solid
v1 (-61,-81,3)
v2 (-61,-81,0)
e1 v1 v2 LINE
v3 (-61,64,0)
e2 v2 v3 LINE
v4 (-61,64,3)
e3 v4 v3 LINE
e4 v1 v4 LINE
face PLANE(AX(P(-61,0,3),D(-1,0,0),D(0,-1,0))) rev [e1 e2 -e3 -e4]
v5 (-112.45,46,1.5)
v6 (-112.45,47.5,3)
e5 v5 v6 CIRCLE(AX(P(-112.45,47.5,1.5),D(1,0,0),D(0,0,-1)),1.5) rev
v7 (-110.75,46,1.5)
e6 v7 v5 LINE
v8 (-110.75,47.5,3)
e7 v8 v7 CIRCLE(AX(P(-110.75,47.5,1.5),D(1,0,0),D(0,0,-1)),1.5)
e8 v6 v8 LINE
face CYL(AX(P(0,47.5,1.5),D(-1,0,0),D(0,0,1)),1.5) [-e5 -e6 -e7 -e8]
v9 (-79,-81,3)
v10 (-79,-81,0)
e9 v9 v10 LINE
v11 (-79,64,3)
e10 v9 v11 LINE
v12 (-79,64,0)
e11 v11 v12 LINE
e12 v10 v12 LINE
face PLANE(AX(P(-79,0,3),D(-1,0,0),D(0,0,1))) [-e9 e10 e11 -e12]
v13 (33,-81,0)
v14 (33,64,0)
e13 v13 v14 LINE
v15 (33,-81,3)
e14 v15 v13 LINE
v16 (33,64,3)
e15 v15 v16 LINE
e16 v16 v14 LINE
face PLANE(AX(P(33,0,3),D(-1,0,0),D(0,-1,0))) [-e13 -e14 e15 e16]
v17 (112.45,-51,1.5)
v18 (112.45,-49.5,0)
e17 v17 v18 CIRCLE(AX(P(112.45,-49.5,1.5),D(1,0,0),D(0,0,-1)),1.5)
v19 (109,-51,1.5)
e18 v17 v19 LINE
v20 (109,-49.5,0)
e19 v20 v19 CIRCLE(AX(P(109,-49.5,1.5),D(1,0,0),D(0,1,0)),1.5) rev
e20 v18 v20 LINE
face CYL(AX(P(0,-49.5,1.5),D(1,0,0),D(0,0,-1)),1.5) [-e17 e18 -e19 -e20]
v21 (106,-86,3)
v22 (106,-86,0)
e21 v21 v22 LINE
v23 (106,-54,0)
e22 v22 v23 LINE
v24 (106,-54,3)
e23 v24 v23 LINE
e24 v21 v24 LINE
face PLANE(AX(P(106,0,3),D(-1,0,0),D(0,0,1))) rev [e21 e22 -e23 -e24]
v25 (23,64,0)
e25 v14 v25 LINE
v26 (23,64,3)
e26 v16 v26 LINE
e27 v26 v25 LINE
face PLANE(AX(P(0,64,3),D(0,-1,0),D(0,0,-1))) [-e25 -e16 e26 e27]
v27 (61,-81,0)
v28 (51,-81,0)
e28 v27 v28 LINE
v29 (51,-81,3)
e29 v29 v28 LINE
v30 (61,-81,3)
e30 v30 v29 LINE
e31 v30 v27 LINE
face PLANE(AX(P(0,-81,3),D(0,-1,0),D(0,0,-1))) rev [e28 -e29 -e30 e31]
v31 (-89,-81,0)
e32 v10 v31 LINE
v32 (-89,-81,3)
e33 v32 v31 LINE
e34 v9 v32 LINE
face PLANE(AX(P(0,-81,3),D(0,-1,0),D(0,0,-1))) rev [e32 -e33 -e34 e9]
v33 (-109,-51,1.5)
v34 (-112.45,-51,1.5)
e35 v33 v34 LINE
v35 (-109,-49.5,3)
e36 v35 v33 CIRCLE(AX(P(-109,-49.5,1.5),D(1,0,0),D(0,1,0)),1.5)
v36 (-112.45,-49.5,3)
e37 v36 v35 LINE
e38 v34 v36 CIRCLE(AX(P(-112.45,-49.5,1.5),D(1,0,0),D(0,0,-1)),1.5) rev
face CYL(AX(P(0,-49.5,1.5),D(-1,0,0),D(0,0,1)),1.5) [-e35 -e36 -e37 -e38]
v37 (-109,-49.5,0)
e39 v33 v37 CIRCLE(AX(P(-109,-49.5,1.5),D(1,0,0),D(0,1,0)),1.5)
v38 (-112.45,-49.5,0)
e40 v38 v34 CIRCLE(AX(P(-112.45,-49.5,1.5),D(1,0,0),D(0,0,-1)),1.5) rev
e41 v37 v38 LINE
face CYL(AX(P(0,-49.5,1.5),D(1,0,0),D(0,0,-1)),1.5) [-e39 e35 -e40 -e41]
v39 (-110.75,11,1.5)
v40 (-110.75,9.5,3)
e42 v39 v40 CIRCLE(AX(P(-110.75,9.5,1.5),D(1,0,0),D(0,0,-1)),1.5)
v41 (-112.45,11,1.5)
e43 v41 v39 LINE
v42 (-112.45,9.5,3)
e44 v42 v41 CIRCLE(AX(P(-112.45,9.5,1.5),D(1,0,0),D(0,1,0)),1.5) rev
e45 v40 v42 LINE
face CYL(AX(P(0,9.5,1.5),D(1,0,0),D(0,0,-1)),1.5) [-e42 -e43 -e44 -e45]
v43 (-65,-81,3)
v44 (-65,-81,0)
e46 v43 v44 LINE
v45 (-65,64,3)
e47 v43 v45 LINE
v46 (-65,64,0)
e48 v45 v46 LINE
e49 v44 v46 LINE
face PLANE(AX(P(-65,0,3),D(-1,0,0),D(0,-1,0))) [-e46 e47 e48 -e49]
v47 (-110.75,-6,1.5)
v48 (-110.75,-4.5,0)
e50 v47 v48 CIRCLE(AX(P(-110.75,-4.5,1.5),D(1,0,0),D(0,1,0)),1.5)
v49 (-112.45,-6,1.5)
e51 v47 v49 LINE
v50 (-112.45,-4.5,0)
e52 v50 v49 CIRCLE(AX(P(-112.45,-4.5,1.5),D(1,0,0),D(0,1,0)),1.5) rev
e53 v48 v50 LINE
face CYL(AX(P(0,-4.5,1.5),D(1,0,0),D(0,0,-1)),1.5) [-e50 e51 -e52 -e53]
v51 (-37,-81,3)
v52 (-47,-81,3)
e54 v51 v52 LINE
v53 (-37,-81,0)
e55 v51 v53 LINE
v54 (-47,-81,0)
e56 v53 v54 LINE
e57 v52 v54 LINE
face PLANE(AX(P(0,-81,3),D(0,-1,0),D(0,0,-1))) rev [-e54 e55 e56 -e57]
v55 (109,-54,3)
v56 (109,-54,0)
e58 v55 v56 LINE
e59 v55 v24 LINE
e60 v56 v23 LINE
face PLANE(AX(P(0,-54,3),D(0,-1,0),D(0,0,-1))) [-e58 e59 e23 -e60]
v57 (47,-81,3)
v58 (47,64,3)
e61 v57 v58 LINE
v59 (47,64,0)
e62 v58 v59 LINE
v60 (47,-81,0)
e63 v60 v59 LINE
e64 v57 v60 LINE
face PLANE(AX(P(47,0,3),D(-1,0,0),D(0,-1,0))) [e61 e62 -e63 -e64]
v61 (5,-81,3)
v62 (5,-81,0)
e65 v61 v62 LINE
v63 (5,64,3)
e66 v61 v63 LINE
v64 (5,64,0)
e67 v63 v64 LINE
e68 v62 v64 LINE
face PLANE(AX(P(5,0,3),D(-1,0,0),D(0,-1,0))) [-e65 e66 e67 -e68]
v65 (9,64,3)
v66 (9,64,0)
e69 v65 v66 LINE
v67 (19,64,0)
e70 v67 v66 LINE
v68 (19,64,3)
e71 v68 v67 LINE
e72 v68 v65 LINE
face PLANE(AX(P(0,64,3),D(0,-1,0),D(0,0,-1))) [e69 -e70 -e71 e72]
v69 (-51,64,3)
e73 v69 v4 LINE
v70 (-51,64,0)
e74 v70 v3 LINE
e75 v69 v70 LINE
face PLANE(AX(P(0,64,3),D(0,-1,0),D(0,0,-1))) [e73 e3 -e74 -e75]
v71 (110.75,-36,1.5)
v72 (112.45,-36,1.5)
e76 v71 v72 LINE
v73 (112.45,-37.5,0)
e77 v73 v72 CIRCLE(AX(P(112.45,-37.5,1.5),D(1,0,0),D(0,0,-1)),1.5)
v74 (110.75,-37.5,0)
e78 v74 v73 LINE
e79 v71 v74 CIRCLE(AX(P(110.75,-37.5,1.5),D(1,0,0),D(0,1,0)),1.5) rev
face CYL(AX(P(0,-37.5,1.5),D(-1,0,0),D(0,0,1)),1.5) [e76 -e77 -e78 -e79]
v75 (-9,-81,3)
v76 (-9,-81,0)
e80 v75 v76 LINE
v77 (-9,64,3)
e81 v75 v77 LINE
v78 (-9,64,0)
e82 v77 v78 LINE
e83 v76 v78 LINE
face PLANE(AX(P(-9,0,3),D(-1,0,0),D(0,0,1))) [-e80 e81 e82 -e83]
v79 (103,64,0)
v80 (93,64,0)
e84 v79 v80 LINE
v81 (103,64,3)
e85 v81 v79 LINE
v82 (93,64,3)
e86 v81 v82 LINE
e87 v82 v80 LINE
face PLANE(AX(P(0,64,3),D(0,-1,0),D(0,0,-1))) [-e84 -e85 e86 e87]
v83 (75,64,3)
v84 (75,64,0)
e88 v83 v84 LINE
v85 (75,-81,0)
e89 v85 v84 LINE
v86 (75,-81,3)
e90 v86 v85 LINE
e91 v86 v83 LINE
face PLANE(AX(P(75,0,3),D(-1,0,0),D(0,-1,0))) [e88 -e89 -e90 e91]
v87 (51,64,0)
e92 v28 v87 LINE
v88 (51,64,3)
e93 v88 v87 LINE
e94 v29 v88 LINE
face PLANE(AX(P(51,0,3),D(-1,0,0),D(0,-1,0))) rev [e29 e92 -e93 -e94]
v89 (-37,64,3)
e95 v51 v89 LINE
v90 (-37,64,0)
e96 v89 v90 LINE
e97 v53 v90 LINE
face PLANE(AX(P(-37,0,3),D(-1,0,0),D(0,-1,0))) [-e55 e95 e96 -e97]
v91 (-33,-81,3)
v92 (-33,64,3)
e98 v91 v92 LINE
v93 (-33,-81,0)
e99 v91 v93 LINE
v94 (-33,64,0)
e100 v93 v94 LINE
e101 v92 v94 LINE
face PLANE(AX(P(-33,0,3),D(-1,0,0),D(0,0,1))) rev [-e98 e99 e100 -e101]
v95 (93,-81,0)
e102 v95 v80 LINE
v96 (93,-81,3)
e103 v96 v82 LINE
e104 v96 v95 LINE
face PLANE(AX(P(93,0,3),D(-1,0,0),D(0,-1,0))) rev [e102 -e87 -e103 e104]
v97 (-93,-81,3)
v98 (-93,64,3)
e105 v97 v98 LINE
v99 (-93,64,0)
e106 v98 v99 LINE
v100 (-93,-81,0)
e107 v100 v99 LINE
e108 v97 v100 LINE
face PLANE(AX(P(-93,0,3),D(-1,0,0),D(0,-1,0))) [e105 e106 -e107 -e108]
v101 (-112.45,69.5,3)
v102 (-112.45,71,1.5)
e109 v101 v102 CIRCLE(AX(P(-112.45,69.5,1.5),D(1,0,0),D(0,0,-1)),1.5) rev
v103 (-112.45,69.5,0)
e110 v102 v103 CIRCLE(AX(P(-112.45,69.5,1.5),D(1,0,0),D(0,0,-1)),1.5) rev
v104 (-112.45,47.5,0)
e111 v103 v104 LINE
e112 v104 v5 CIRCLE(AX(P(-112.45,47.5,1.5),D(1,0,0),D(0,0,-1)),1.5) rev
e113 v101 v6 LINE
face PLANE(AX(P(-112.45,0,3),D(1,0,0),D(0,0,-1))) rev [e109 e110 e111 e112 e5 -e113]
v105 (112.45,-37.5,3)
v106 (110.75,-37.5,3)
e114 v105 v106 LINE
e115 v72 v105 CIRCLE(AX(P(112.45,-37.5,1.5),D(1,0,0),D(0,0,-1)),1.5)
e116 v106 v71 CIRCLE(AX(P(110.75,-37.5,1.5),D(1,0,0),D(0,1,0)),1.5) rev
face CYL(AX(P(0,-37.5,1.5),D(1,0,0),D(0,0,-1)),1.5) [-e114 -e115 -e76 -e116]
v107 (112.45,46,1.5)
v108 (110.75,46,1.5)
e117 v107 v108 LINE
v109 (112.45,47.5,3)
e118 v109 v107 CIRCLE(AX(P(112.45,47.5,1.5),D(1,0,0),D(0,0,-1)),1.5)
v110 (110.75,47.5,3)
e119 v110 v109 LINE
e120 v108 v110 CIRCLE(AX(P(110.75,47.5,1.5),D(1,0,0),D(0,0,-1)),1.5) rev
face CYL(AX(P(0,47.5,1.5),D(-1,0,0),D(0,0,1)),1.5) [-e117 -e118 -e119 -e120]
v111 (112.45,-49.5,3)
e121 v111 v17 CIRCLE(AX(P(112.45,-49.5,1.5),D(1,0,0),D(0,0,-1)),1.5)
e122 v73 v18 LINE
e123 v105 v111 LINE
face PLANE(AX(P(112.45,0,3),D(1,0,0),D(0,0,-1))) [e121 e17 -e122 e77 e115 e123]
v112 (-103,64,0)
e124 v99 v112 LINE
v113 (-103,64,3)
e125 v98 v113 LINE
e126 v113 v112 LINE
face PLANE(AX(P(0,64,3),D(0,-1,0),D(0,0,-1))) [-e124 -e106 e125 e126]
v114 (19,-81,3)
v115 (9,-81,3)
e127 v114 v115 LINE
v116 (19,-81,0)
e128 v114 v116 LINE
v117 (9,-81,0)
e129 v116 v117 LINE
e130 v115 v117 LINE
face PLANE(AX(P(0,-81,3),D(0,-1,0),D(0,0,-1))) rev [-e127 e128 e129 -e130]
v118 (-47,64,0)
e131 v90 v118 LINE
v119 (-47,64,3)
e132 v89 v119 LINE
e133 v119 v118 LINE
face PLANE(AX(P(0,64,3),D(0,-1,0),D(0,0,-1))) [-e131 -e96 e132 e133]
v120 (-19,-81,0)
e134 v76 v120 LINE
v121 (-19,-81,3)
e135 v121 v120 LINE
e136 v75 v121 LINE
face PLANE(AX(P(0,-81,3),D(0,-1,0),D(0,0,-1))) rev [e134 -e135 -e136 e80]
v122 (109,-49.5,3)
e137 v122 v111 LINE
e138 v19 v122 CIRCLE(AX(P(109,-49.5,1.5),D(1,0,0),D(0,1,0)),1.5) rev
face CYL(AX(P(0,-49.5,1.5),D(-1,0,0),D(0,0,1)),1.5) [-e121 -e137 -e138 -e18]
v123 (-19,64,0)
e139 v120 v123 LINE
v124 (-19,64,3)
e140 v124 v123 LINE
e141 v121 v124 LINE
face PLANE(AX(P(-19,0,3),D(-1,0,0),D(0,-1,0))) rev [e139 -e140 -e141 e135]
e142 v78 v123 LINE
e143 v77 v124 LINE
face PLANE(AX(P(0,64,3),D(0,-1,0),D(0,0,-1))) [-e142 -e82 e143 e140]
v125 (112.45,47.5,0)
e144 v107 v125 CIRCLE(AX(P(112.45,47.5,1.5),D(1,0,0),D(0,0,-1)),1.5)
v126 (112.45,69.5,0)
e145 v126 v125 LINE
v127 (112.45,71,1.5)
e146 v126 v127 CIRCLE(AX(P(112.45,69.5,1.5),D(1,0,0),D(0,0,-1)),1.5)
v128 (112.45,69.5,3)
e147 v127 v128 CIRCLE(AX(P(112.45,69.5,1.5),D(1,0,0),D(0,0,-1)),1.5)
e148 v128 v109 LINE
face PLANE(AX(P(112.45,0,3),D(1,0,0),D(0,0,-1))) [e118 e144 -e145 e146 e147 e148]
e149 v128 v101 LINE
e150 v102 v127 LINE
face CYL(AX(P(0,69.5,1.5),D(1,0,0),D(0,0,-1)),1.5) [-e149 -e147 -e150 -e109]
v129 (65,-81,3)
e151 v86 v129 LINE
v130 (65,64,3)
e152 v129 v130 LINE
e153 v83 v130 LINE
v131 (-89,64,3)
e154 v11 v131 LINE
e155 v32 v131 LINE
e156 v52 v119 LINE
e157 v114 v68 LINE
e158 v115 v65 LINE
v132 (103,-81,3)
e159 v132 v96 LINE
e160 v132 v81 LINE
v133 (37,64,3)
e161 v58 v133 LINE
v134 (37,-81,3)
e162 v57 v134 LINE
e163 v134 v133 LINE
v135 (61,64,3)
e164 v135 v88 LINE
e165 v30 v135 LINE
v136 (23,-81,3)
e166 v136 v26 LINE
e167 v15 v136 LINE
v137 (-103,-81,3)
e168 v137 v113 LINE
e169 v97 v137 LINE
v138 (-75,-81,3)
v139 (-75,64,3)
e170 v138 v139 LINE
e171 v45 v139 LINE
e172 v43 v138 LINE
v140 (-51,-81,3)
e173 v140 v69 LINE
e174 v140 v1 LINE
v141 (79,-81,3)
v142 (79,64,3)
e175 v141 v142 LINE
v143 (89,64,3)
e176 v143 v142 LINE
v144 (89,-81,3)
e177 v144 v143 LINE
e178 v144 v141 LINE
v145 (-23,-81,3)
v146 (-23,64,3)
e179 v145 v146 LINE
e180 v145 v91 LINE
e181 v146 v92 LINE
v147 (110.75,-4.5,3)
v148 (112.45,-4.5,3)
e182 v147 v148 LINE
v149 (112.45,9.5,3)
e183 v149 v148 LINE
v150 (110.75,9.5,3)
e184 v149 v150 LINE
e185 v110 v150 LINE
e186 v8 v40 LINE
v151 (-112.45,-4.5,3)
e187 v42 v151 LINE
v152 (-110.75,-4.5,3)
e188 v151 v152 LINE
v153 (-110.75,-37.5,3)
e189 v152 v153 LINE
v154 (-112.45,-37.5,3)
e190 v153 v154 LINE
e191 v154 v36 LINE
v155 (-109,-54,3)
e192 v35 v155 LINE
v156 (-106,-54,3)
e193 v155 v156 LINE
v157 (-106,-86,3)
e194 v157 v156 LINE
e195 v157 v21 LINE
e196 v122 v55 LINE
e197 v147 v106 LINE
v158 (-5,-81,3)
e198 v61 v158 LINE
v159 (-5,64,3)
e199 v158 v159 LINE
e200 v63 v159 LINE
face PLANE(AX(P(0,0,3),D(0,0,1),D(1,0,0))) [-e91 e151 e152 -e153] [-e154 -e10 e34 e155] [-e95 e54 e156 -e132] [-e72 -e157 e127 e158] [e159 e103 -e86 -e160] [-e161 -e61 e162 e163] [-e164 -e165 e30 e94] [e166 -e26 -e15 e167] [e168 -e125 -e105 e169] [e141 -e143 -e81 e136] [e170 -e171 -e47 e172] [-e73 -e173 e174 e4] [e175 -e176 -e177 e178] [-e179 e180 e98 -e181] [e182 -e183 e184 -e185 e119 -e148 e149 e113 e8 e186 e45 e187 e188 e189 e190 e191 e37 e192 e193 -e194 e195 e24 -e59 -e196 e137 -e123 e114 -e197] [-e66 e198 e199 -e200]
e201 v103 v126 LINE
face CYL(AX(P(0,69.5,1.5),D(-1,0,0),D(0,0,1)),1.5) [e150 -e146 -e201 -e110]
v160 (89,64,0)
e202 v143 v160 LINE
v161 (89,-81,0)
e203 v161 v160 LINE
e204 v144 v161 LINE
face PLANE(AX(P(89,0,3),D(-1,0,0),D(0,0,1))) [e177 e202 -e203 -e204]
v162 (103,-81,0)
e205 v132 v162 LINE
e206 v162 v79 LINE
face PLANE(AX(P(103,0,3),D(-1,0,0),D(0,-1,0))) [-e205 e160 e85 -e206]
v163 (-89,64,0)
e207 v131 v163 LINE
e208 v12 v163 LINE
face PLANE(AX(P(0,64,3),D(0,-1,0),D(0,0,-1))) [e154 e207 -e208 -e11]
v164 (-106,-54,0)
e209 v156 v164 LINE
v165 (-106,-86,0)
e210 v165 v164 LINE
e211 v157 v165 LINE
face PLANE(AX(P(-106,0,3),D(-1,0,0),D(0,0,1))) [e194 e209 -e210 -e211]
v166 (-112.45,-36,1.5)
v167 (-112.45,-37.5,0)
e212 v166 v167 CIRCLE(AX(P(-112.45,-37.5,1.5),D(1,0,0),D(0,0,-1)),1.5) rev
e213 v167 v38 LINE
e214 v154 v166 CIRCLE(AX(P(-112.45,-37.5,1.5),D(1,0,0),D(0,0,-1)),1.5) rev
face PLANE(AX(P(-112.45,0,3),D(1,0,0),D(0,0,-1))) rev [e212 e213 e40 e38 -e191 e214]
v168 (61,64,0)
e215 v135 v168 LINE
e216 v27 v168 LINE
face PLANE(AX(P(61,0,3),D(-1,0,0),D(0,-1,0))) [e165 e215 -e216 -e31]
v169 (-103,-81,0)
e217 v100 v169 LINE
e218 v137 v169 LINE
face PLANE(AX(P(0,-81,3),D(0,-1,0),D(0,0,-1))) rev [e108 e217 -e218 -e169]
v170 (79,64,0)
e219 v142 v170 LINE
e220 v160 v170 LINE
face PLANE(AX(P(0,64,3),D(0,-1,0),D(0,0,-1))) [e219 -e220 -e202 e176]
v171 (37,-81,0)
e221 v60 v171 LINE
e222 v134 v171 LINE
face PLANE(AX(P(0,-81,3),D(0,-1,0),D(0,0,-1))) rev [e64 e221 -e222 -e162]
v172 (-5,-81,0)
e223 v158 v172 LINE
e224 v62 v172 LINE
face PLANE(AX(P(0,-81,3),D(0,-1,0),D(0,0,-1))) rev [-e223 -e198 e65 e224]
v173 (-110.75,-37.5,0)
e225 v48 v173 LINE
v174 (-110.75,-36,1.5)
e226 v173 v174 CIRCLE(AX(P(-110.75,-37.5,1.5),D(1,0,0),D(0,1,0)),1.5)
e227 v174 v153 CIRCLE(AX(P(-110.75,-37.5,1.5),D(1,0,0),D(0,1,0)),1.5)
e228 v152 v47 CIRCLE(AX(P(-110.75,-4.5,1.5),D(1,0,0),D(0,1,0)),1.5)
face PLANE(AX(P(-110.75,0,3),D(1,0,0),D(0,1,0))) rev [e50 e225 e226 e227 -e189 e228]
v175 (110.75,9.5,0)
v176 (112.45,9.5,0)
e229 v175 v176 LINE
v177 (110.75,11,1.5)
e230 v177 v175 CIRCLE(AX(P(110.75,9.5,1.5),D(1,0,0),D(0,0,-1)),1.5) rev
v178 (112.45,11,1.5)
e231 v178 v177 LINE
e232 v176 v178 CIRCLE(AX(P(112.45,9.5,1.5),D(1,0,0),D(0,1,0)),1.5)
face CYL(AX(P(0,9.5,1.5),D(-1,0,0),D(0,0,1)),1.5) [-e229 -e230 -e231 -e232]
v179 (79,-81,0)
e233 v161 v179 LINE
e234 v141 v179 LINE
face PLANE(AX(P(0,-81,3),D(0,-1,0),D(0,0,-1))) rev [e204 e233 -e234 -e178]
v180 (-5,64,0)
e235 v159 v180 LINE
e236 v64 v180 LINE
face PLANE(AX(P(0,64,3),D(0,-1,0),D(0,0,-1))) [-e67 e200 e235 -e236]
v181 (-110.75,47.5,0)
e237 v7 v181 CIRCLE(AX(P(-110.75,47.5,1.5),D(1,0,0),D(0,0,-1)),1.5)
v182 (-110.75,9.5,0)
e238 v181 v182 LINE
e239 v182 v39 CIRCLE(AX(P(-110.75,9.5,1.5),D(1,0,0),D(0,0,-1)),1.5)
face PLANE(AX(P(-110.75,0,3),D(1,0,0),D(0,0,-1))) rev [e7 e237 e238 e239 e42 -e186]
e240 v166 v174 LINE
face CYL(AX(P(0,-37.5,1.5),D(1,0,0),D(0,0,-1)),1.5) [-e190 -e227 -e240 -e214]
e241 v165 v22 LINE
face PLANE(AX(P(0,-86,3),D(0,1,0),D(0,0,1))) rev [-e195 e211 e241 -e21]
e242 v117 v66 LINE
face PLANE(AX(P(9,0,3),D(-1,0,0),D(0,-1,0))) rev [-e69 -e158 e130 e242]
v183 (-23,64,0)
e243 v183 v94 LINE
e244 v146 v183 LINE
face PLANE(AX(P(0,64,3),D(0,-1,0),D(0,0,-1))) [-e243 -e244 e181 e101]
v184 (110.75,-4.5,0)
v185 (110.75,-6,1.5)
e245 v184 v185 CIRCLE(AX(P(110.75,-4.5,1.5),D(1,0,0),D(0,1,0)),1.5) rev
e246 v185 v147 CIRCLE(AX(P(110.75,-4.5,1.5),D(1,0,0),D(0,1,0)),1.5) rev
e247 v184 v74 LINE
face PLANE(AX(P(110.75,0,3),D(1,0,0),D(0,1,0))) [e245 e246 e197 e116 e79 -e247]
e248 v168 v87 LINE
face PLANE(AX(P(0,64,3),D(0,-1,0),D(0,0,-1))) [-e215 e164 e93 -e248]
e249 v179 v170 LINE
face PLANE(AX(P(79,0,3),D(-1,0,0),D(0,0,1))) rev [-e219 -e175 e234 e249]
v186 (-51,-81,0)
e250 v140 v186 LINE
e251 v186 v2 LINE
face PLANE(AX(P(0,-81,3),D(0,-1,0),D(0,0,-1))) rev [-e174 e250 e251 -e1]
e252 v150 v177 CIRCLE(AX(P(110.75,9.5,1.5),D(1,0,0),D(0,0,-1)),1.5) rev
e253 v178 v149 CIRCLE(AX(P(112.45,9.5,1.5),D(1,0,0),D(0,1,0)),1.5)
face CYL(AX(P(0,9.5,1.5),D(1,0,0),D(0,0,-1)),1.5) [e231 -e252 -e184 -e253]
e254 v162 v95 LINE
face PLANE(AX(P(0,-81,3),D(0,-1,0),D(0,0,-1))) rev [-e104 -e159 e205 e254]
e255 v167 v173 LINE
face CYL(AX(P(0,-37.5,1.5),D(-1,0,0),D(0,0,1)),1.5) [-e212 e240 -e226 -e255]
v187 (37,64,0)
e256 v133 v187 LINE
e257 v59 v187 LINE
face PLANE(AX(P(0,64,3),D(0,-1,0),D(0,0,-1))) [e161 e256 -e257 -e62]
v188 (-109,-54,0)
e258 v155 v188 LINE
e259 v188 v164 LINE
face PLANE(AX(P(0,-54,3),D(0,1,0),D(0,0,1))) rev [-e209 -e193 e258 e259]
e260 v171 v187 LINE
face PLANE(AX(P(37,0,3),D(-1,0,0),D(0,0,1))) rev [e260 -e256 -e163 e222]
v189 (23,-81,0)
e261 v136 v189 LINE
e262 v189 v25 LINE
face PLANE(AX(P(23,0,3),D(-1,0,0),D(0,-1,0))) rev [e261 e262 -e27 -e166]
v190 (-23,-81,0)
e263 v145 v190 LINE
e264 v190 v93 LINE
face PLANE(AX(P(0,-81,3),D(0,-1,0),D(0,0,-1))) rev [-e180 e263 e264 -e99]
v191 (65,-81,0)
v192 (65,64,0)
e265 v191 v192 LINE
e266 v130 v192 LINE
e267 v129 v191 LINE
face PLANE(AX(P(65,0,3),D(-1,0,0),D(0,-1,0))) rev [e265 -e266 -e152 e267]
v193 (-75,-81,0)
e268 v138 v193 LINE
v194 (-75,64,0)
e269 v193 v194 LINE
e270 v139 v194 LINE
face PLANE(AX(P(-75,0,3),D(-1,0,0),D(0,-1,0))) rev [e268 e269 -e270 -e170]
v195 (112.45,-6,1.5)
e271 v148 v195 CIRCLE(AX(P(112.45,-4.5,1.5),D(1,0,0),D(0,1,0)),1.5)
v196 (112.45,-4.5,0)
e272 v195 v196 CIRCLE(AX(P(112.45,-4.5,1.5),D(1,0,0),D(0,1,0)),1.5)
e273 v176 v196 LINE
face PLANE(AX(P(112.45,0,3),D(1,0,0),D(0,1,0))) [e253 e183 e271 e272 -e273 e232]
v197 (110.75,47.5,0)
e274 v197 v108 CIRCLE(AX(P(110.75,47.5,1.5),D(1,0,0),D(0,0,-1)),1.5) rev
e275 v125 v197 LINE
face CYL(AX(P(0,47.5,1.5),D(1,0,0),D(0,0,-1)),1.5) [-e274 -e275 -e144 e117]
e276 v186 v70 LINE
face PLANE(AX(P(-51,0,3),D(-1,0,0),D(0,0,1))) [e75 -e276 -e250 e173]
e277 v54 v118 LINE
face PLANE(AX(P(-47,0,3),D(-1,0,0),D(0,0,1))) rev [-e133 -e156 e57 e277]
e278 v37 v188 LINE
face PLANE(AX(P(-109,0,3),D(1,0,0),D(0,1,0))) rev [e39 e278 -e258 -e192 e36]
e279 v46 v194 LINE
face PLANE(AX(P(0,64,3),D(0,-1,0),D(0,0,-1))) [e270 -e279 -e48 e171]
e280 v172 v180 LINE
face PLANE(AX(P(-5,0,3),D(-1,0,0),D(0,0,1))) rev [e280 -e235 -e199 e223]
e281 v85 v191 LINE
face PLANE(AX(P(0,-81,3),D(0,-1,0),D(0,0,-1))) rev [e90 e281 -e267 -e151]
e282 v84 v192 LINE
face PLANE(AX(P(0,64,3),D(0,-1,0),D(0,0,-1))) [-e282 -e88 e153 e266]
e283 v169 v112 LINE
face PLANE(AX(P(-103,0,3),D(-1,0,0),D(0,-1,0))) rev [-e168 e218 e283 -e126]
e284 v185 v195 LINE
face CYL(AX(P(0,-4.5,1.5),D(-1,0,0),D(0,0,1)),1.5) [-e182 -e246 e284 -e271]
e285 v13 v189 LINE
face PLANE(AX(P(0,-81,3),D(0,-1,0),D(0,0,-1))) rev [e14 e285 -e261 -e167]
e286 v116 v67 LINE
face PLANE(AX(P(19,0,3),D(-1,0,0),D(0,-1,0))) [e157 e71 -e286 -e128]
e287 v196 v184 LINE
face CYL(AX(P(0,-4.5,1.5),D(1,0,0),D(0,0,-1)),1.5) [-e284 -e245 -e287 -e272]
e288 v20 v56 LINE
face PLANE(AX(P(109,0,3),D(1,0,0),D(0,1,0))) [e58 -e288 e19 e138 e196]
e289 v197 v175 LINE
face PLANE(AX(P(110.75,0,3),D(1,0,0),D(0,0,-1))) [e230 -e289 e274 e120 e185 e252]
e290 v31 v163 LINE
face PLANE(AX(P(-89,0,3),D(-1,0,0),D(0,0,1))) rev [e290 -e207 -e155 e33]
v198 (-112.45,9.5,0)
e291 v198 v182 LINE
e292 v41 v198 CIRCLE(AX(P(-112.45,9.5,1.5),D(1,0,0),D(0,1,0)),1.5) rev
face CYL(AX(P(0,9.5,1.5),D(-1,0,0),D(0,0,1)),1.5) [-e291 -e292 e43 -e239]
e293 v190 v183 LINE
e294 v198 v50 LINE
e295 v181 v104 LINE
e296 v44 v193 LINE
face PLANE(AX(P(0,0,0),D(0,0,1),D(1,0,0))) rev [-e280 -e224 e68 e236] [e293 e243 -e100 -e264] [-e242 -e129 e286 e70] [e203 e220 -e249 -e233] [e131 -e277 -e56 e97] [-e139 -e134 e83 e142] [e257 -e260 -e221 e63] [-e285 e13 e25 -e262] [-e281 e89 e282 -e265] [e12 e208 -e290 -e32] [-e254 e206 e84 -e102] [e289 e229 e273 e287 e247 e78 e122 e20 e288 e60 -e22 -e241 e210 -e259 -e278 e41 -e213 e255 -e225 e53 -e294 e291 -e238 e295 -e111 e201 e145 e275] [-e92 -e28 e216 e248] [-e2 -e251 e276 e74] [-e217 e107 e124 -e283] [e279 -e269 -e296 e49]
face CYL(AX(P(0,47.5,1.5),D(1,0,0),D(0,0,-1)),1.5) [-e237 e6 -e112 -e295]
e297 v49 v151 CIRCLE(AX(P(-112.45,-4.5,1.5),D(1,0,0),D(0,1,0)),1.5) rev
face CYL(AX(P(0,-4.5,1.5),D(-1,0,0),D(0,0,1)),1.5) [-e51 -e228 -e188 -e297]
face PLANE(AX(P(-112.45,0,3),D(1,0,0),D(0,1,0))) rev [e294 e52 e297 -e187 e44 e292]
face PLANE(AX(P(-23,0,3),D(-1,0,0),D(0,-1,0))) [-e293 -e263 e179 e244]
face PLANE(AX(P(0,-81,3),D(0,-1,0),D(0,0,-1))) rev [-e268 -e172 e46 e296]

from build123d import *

# Parameters (mm, degrees)
SKETCH_1_W      = 10
SKETCH_1_H      = 145
EXTRUDE_1_DEPTH = 3
FILLET_1_R      = 1.5


with BuildPart() as part:
    # 草图1 → 凸台-拉伸1 (new body)
    with BuildSketch(Plane.XY):
        Polygon((110.75, 71), (-110.75, 71), (-112.45, 71), (-112.45, 46), (-110.75, 46), (-110.75, 11), (-112.45, 11), (-112.45, -6), (-110.75, -6), (-110.75, -36), (-112.45, -36), (-112.45, -51), (-109, -51), (-109, -54), (-106, -54), (-106, -71), (-106, -86), (106, -86), (106, -71), (106, -54), (109, -54), (109, -51), (112.45, -51), (112.45, -36), (110.75, -36), (110.75, -6), (112.45, -6), (112.45, 11), (110.75, 11), (110.75, 46), (112.45, 46), (112.45, 71), align=None)
        with Locations((0, -8.5)):
            Rectangle(SKETCH_1_W, SKETCH_1_H, mode=Mode.SUBTRACT)
        with Locations((14, -8.5)):
            Rectangle(SKETCH_1_W, SKETCH_1_H, mode=Mode.SUBTRACT)
        with Locations((28, -8.5)):
            Rectangle(SKETCH_1_W, SKETCH_1_H, mode=Mode.SUBTRACT)
        with Locations((42, -8.5)):
            Rectangle(SKETCH_1_W, SKETCH_1_H, mode=Mode.SUBTRACT)
        with Locations((56, -8.5)):
            Rectangle(SKETCH_1_W, SKETCH_1_H, mode=Mode.SUBTRACT)
        with Locations((70, -8.5)):
            Rectangle(SKETCH_1_W, SKETCH_1_H, mode=Mode.SUBTRACT)
        with Locations((84, -8.5)):
            Rectangle(SKETCH_1_W, SKETCH_1_H, mode=Mode.SUBTRACT)
        with Locations((98, -8.5)):
            Rectangle(SKETCH_1_W, SKETCH_1_H, mode=Mode.SUBTRACT)
        with Locations((-14, -8.5)):
            Rectangle(SKETCH_1_W, SKETCH_1_H, mode=Mode.SUBTRACT)
        with Locations((-28, -8.5)):
            Rectangle(SKETCH_1_W, SKETCH_1_H, mode=Mode.SUBTRACT)
        with Locations((-42, -8.5)):
            Rectangle(SKETCH_1_W, SKETCH_1_H, mode=Mode.SUBTRACT)
        with Locations((-56, -8.5)):
            Rectangle(SKETCH_1_W, SKETCH_1_H, mode=Mode.SUBTRACT)
        with Locations((-70, -8.5)):
            Rectangle(SKETCH_1_W, SKETCH_1_H, mode=Mode.SUBTRACT)
        with Locations((-84, -8.5)):
            Rectangle(SKETCH_1_W, SKETCH_1_H, mode=Mode.SUBTRACT)
        with Locations((-98, -8.5)):
            Rectangle(SKETCH_1_W, SKETCH_1_H, mode=Mode.SUBTRACT)
    extrude(amount=EXTRUDE_1_DEPTH)

    # 圆角1
    fillet_1_edges = [part.edges().sort_by_distance(p)[0] for p in [
        (111.6, -6, 3),
        (111.6, -6, 0),
        (110.725, -51, 0),
        (110.725, -51, 3),
        (111.6, -36, 0),
        (111.6, -36, 3),
        (111.6, 11, 3),
        (111.6, 11, 0),
        (111.6, 46, 0),
        (111.6, 46, 3),
        (0, 71, 0),
        (0, 71, 3),
        (-111.6, 11, 0),
        (-111.6, 11, 3),
        (-111.6, -6, 0),
        (-111.6, -6, 3),
        (-111.6, 46, 0),
        (-111.6, 46, 3),
        (-111.6, -36, 0),
        (-111.6, -36, 3),
        (-110.725, -51, 0),
        (-110.725, -51, 3),
    ]]
    fillet(fillet_1_edges, radius=FILLET_1_R - 0.0001)  # a hair under: the kernel refuses the full size


solid = part.part
